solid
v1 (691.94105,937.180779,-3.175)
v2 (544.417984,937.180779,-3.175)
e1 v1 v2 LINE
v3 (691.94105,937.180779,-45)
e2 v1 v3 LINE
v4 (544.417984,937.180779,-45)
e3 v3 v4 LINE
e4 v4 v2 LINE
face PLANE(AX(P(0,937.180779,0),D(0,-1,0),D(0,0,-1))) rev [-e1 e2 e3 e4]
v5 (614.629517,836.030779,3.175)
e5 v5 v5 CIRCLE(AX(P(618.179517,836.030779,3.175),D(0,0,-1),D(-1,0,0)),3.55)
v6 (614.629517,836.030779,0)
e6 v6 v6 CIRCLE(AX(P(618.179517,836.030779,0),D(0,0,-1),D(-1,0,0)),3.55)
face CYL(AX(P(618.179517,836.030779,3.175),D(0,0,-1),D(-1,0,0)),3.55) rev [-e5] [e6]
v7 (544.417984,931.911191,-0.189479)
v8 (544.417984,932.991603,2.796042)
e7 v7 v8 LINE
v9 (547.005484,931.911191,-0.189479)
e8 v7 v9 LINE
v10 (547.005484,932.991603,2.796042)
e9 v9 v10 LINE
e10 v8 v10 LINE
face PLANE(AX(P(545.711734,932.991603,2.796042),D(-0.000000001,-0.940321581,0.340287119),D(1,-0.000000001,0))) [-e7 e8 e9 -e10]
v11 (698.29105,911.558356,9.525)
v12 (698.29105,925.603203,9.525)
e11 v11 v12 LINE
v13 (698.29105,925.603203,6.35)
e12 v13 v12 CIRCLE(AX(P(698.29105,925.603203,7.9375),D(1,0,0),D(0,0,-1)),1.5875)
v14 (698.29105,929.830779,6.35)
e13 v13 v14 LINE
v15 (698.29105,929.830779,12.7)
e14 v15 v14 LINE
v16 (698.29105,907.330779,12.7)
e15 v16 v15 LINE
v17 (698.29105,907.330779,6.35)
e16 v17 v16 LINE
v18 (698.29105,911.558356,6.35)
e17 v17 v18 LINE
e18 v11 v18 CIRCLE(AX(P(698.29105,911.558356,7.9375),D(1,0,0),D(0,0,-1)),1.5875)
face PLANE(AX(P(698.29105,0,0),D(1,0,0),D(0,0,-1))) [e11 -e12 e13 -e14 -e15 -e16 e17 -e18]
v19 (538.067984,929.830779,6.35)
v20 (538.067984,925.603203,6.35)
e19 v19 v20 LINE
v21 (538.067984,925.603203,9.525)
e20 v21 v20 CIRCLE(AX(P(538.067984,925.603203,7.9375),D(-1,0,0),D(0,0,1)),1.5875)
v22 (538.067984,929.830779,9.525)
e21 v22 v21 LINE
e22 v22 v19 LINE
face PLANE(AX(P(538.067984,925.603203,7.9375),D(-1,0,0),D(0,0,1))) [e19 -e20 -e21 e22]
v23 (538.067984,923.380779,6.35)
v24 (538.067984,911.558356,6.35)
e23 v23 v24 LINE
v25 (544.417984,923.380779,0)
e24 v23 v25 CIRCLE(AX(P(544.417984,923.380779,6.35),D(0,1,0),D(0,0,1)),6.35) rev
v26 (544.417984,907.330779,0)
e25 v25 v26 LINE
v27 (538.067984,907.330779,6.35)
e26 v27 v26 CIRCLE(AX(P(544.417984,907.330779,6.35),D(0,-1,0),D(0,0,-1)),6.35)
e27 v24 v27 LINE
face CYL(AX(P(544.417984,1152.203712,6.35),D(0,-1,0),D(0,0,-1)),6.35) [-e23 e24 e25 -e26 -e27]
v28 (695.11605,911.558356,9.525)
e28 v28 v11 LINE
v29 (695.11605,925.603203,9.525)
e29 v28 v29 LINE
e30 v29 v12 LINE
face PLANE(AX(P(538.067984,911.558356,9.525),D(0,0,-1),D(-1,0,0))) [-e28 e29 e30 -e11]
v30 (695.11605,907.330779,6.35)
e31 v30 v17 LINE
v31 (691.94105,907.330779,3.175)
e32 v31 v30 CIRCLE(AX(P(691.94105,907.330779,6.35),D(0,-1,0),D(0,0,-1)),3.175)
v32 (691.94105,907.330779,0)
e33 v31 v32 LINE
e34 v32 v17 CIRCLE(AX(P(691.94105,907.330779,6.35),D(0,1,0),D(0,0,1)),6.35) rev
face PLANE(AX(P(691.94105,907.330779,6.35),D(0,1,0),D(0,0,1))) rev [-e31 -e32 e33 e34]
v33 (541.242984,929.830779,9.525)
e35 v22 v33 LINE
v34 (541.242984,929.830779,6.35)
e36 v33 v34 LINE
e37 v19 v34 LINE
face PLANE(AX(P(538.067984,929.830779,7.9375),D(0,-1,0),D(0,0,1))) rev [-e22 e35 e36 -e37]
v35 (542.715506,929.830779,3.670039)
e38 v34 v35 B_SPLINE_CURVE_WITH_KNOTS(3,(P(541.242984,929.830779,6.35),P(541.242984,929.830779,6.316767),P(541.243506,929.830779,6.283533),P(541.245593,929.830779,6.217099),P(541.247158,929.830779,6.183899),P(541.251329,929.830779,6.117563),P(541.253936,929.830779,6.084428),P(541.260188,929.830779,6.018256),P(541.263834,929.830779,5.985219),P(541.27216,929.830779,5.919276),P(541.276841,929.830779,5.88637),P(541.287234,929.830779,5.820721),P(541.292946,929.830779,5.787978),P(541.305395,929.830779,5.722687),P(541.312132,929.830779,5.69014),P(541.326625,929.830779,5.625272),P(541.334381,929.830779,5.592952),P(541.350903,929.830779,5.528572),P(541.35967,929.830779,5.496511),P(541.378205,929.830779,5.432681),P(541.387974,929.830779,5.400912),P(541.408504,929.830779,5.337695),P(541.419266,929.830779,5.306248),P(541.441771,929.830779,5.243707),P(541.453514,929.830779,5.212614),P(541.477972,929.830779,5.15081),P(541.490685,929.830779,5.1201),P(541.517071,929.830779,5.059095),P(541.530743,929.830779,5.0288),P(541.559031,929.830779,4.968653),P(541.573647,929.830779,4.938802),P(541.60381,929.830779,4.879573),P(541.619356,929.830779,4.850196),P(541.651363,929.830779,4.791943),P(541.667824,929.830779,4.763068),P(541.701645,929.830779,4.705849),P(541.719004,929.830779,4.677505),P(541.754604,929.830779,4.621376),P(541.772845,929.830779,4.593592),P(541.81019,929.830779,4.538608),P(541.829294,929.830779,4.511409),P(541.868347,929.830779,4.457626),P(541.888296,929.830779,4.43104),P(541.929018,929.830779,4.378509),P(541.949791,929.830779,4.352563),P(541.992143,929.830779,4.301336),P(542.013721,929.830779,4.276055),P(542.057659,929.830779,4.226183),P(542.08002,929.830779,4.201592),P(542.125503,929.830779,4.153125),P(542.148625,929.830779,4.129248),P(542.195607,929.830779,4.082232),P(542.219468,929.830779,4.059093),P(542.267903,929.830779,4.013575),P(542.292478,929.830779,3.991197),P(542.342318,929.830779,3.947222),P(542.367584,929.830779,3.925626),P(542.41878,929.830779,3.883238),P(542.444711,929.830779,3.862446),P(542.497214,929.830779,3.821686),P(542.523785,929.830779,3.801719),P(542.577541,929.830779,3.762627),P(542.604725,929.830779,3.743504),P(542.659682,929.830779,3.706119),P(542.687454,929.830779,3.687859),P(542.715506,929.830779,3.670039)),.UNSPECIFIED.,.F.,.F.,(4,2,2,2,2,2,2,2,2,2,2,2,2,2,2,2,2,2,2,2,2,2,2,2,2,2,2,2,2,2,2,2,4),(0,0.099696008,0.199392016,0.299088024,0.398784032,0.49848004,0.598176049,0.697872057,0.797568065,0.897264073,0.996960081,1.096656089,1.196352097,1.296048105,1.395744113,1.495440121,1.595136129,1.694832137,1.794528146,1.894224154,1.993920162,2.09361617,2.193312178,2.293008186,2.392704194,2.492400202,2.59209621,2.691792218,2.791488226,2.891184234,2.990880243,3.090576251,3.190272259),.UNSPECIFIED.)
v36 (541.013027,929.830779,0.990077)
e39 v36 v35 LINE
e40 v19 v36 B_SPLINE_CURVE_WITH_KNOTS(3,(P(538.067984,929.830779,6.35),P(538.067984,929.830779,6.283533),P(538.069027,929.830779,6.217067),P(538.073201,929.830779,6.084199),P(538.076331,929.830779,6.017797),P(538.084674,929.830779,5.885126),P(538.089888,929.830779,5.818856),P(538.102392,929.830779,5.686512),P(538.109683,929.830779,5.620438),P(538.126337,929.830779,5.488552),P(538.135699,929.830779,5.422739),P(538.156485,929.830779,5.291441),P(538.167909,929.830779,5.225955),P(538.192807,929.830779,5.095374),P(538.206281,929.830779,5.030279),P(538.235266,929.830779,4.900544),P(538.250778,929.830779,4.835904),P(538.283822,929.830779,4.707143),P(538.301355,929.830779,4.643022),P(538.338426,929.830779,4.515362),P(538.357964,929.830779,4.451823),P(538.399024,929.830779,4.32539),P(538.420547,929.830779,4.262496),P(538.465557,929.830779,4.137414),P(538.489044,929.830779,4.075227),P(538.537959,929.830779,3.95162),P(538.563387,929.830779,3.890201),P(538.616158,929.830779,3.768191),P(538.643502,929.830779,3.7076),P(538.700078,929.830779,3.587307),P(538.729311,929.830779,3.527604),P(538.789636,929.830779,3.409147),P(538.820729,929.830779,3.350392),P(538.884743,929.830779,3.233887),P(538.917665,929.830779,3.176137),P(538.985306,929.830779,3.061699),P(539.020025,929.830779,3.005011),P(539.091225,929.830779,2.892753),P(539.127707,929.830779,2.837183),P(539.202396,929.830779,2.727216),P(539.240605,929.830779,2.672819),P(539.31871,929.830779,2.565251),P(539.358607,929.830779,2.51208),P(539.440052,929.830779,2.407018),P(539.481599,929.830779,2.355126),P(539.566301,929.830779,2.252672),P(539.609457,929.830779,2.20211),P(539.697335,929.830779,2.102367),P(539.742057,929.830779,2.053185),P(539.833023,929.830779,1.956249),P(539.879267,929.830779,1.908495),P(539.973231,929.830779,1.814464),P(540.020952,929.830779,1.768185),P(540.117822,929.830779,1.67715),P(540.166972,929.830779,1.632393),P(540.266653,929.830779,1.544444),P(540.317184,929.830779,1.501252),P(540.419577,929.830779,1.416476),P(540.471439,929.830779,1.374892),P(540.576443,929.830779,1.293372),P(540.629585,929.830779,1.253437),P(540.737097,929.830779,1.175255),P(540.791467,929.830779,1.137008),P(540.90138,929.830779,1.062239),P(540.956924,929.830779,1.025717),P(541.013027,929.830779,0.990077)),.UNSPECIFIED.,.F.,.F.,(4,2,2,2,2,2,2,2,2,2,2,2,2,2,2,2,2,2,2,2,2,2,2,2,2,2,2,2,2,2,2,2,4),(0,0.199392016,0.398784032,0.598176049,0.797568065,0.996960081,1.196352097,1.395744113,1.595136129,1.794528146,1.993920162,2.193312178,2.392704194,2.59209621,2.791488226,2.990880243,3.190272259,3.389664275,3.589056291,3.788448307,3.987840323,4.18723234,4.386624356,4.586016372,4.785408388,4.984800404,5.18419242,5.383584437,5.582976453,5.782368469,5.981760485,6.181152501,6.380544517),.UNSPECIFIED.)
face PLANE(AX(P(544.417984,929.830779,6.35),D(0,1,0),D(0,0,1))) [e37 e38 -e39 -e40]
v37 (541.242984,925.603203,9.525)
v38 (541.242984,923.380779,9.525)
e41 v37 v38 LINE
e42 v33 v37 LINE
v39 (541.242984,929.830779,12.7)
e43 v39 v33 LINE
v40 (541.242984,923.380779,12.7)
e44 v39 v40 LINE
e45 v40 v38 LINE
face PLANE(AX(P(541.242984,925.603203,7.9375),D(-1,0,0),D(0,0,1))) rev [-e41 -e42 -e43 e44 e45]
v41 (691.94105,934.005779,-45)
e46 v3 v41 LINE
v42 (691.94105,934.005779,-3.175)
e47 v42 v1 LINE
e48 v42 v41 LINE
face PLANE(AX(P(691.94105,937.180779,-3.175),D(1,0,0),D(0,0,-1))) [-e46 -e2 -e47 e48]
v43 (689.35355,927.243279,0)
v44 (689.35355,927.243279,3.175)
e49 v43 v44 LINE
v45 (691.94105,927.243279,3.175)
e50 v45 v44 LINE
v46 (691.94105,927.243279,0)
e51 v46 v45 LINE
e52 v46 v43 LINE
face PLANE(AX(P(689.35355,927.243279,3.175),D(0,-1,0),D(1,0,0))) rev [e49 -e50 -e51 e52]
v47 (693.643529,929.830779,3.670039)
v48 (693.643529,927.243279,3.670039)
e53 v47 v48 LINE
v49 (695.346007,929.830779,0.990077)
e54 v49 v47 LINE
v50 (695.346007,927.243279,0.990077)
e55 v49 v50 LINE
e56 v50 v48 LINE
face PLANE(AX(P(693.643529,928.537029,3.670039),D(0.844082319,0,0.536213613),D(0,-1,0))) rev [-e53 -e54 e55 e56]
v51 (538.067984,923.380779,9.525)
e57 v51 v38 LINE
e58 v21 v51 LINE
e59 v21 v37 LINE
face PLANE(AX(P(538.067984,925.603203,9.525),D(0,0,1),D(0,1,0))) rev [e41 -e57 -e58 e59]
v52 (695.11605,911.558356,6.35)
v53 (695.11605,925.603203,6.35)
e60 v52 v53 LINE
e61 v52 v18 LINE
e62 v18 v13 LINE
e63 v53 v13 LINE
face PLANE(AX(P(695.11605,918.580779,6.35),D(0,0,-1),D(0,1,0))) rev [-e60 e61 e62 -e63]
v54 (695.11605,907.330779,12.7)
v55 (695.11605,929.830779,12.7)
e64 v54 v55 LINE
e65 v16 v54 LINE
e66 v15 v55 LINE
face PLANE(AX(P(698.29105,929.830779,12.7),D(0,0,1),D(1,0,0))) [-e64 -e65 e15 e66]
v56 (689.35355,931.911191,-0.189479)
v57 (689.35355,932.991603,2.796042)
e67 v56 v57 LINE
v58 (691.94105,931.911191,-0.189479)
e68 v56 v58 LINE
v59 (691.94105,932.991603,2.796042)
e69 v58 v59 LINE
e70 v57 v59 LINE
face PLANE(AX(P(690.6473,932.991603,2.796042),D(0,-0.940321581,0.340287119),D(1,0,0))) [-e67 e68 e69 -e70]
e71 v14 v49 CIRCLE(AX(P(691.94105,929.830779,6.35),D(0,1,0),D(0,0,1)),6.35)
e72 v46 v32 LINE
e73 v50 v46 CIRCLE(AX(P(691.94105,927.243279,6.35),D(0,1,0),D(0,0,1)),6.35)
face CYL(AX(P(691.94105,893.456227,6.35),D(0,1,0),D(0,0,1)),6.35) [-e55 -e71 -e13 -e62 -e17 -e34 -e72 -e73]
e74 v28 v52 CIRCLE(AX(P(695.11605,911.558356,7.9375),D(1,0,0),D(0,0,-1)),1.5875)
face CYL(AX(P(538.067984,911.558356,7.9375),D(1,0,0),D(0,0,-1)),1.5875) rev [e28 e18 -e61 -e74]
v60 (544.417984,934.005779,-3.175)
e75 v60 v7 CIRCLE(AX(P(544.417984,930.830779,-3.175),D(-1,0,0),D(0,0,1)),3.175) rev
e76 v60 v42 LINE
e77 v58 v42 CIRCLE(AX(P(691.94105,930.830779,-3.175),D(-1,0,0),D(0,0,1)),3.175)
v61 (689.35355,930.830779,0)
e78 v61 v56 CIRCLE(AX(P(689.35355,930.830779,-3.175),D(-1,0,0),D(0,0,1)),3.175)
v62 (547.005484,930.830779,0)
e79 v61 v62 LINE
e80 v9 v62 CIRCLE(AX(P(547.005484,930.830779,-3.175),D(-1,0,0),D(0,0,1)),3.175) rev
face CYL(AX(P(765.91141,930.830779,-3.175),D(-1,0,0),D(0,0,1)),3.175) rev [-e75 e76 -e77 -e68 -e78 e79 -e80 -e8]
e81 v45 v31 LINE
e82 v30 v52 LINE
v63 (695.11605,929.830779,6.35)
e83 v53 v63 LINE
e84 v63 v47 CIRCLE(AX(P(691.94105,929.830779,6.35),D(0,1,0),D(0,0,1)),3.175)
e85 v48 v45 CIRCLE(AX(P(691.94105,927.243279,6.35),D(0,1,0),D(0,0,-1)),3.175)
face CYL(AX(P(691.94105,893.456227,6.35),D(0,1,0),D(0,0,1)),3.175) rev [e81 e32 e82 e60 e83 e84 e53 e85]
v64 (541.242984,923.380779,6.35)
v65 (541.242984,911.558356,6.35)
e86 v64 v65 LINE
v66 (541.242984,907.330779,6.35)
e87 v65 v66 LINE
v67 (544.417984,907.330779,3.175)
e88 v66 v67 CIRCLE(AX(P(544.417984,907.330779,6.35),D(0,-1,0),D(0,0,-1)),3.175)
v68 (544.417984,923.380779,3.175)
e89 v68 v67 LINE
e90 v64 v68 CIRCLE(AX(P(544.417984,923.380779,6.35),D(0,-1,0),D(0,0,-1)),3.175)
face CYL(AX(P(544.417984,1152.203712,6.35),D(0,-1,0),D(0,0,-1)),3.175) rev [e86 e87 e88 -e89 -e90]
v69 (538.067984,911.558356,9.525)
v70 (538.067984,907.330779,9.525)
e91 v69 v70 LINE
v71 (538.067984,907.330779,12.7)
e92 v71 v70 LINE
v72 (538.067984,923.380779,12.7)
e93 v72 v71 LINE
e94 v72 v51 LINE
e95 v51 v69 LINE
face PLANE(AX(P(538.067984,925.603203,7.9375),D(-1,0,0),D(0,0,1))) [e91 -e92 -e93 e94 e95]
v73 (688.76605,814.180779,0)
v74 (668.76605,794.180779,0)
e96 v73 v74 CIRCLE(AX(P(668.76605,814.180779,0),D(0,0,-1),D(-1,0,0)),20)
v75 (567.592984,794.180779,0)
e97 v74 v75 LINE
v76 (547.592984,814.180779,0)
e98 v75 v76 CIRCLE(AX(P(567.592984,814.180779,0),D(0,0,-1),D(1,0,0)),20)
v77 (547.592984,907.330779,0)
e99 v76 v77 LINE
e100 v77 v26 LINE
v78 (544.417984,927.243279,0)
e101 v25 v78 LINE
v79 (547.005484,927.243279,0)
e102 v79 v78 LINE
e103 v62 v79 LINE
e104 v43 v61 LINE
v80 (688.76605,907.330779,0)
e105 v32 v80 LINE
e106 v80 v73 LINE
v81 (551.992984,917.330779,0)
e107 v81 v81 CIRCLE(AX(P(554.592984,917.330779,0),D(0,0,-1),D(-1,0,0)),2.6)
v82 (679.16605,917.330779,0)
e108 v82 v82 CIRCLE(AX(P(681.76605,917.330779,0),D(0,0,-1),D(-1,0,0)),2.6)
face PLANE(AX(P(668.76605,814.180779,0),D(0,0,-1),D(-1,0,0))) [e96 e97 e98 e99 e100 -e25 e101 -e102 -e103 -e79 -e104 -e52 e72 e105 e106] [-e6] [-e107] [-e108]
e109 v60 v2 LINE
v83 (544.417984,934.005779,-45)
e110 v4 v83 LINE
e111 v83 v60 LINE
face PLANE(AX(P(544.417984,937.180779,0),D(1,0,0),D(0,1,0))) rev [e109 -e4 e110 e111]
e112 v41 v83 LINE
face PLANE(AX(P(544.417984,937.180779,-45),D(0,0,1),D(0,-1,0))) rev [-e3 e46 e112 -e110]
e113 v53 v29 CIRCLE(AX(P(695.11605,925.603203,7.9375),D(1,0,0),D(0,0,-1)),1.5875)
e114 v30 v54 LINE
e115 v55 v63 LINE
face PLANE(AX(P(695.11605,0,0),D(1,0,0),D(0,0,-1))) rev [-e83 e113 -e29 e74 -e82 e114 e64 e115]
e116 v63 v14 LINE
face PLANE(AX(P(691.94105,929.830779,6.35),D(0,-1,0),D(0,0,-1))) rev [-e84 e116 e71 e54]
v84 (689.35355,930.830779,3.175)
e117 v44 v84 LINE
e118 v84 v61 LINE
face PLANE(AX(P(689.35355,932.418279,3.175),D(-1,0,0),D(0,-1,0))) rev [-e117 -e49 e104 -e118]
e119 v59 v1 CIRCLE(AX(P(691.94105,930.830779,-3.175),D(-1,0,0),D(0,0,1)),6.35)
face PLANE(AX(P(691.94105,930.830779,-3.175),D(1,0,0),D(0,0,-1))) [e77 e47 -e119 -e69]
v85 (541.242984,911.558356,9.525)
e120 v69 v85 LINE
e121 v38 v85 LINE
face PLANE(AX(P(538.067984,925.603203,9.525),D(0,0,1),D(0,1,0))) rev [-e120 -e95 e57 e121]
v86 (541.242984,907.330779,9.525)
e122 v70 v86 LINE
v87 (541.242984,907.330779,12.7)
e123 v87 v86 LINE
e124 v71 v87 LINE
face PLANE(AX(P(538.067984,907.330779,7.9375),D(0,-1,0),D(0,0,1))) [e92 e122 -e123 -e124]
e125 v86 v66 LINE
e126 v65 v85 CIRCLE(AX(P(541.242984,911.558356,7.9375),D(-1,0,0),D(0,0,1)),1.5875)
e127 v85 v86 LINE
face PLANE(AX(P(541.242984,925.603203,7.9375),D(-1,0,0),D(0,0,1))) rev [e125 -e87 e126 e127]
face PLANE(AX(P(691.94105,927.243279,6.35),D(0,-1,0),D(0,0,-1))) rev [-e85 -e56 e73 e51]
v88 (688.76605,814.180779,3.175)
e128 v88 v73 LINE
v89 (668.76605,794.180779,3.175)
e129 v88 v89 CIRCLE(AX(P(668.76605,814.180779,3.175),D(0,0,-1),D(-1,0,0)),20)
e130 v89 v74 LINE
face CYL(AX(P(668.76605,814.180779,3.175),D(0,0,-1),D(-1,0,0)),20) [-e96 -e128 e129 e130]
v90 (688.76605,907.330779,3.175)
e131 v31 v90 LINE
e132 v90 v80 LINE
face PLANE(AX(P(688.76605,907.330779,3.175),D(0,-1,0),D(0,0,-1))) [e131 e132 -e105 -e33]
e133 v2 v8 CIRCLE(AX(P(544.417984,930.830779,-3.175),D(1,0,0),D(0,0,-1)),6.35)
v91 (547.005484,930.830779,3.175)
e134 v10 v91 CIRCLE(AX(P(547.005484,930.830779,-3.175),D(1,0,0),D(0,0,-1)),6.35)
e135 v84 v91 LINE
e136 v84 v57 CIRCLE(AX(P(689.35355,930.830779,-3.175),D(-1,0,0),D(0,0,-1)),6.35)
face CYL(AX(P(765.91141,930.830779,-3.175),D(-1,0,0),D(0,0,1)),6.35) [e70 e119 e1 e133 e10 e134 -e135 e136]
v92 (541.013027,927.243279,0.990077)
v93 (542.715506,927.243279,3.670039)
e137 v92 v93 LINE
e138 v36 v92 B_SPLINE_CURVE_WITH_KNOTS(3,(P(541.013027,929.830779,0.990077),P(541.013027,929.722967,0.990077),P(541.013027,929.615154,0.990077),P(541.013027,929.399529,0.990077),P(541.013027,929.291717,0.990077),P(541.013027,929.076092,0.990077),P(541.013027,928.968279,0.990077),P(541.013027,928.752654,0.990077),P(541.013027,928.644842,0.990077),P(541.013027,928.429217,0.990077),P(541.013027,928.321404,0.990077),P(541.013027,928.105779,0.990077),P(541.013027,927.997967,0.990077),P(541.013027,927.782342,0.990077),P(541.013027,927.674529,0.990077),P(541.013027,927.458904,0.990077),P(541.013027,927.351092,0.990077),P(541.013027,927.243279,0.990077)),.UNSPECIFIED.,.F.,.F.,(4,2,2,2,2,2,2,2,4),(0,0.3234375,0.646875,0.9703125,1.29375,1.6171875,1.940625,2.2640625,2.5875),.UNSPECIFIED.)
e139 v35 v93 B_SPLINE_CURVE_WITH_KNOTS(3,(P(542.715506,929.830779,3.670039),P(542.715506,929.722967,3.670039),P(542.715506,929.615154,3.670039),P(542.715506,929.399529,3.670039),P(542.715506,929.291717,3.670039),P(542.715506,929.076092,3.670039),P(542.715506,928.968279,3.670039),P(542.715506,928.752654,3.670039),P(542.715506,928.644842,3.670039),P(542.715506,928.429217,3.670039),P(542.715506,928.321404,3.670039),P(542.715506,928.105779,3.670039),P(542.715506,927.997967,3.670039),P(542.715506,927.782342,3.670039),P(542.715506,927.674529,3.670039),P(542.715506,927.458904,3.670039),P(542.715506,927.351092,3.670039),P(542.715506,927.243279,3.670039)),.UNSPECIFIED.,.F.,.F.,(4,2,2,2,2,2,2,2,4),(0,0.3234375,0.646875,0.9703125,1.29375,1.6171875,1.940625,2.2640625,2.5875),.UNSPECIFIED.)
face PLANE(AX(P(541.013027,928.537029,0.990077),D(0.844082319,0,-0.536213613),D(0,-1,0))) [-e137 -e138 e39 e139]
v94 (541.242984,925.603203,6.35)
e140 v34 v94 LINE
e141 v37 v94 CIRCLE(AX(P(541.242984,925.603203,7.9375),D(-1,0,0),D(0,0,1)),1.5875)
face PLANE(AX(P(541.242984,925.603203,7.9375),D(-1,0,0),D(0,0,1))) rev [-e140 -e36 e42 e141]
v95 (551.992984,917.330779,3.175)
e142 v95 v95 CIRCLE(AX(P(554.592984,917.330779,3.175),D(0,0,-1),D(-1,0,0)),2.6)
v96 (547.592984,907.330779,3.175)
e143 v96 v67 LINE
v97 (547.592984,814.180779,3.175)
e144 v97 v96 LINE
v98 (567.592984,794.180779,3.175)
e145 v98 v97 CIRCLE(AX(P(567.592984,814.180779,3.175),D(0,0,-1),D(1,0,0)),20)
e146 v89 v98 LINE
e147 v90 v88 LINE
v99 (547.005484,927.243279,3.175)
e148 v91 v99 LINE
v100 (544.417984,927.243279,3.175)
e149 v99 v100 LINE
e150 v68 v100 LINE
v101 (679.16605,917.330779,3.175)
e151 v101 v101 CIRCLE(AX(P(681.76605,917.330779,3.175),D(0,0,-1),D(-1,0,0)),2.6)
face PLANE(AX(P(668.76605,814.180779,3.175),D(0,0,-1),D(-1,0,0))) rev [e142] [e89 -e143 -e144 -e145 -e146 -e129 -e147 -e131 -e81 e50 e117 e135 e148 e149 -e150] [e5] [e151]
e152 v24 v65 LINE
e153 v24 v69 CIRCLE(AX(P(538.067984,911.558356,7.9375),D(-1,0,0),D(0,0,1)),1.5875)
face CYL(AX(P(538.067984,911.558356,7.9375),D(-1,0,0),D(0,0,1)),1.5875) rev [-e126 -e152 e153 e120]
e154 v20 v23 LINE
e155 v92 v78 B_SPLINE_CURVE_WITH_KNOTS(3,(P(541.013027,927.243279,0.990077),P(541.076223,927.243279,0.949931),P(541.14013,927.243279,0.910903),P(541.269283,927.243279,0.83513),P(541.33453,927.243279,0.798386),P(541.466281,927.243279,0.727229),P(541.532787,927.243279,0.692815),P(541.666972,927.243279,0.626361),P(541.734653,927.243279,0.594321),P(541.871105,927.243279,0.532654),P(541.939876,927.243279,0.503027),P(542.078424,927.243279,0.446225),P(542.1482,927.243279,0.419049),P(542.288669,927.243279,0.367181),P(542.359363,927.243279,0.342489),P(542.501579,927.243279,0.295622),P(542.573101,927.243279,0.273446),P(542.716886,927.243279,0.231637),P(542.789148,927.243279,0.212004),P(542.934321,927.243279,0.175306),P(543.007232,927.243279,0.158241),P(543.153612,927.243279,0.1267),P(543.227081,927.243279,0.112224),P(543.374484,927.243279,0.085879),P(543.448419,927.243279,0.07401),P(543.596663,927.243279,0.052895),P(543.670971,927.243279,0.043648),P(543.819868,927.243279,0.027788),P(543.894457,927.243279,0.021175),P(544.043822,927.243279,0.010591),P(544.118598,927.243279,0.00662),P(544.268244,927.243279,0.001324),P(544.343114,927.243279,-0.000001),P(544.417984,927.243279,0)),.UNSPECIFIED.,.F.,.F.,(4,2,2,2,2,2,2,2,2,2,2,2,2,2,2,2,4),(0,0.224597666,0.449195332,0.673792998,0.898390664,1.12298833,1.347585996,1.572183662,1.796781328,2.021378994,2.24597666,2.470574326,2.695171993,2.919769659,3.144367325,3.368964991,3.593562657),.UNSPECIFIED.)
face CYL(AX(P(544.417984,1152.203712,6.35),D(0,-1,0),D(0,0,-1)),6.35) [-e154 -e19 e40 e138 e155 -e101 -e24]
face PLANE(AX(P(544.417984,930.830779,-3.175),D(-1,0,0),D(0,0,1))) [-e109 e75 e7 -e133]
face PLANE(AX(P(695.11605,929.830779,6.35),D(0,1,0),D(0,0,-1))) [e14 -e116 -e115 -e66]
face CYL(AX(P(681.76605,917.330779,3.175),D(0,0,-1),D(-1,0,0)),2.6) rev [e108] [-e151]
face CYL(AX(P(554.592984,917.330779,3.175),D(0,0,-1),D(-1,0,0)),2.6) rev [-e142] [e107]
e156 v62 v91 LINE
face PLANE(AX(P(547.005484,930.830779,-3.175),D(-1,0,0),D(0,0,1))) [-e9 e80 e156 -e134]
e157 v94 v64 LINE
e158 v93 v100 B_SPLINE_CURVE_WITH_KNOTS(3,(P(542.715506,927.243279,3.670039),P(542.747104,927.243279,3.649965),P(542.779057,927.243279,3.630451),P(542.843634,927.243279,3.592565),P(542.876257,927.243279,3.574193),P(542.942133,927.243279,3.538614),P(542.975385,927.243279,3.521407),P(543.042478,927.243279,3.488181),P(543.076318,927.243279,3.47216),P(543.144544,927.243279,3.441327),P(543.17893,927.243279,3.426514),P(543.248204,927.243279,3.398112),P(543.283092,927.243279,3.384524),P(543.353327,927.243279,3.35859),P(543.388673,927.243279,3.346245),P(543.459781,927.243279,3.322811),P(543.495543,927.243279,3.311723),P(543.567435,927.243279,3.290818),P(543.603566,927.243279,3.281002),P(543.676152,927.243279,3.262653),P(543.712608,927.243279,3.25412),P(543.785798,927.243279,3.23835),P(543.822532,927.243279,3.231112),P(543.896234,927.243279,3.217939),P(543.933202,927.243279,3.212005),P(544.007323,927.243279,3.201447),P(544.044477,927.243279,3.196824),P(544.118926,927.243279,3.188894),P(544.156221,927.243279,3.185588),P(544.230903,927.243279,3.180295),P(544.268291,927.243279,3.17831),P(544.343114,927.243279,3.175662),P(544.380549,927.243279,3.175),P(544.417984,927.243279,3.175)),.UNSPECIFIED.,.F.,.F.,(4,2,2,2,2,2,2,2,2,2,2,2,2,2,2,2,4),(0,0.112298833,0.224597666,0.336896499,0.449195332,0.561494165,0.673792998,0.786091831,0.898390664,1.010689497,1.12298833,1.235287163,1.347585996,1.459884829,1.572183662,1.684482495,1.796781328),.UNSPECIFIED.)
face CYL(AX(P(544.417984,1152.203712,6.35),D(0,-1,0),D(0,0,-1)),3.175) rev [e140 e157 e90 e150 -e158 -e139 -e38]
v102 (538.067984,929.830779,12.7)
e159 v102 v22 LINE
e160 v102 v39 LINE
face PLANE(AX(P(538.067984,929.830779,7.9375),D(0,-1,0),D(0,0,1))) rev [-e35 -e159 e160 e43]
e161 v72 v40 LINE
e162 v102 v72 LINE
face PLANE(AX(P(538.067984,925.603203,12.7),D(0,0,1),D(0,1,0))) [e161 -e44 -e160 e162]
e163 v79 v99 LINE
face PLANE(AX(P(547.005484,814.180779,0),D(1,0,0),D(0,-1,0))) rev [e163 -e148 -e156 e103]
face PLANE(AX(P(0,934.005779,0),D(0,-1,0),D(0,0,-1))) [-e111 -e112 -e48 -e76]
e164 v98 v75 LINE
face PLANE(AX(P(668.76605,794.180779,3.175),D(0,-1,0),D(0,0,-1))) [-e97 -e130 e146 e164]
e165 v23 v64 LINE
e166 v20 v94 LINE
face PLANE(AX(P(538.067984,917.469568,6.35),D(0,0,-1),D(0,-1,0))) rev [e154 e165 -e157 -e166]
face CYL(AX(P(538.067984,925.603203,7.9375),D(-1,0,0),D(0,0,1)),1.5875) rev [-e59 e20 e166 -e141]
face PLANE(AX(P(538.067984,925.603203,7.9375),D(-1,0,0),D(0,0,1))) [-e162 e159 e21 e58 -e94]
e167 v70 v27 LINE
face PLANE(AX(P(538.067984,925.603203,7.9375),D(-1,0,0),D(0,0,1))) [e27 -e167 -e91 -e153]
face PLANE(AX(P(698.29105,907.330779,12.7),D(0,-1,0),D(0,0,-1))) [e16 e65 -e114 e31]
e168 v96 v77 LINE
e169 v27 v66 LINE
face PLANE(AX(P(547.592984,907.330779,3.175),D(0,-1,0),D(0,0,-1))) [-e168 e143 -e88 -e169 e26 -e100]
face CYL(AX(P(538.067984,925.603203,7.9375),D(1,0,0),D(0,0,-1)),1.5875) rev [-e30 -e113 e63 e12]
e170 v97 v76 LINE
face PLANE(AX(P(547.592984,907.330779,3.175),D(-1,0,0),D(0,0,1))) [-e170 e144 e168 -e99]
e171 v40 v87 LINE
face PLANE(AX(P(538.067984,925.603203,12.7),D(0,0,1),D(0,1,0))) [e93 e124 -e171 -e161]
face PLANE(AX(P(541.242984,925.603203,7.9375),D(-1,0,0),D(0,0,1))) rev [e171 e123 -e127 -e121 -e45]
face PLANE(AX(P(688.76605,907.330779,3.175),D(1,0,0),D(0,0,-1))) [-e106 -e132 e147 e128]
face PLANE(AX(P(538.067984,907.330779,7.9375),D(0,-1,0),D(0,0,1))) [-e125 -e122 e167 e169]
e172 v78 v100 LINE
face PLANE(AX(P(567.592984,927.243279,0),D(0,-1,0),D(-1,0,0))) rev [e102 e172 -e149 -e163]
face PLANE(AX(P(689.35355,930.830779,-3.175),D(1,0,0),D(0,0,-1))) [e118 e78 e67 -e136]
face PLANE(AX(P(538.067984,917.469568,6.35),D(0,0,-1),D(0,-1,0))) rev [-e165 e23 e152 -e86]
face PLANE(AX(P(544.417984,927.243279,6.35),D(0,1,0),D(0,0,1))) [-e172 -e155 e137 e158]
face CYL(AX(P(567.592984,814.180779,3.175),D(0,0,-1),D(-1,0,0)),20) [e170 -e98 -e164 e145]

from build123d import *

# Parameters (mm, degrees)
SKETCH13_R              = 2.6
SKETCH13_R_2            = 3.55
BASE_FLANGE1_DEPTH      = 3.175
EDGE_FLANGE2_DEPTH      = 22.5
EDGE_FLANGE3_DEPTH      = 22.5
CUT_EXTRUDE3_DEPTH      = 944.619626468
CUT_EXTRUDE3_DEPTH_BACK = 944.619626468
EDGE_FLANGE4_DEPTH      = 147.523066449
CORNER_START            = 927.243279461
CORNER_RELIEF2_DEPTH    = 2.5875
CORNER_START_2          = 544.417983929
CORNER_RELIEF2_2_DEPTH  = 2.5875
CORNER_RELIEF3_DEPTH    = 2.5875
CORNER_START_3          = 689.353550378
CORNER_RELIEF3_2_DEPTH  = 2.5875


with BuildPart() as part:
    # Base-Flange1: sheet metal written as solids
    # Sketch13 → Base-Flange1 (new body)
    with BuildSketch(Plane(origin=(0, 0, 0), x_dir=(-1, 0, 0), z_dir=(0, 0, -1))):
        with BuildLine():
            Line((-547.592983929, 907.330779461), (-547.592983929, 814.180779461))
            ThreePointArc((-547.592983929, 814.180779461), (-553.450848305, 800.038643837), (-567.592983929, 794.180779461))
            Line((-567.592983929, 794.180779461), (-668.766050378, 794.180779461))
            ThreePointArc((-668.766050378, 794.180779461), (-682.908186002, 800.038643837), (-688.766050378, 814.180779461))
            Line((-688.766050378, 814.180779461), (-688.766050378, 907.330779461))
            Line((-688.766050378, 907.330779461), (-691.941050378, 907.330779461))
            Line((-691.941050378, 907.330779461), (-691.941050378, 929.830779461))
            Line((-691.941050378, 929.830779461), (-544.417983929, 929.830779461))
            Line((-544.417983929, 929.830779461), (-544.417983929, 907.330779461))
            Line((-544.417983929, 907.330779461), (-547.592983929, 907.330779461))
        make_face()
        with Locations((-681.766050378, 917.330779461)):
            Circle(SKETCH13_R, mode=Mode.SUBTRACT)
        with Locations((-618.179517153, 836.030779461)):
            Circle(SKETCH13_R_2, mode=Mode.SUBTRACT)
        with Locations((-554.592983929, 917.330779461)):
            Circle(SKETCH13_R, mode=Mode.SUBTRACT)
    extrude(amount=-BASE_FLANGE1_DEPTH)

    # Edge-Flange2: sheet metal written as solids
    # Edge-Flange2 section (on a plane across the edge) → Edge-Flange2 (add)
    with BuildSketch(Plane(origin=(695.116050378, 907.330779461, 3.175), x_dir=(-1, 0, 0), z_dir=(0, 1, 0))):
        with BuildLine():
            Line((-3.175, 3.175), (-3.175, 9.525))
            Line((-3.175, 9.525), (0, 9.525))
            Line((0, 9.525), (0, 3.175))
            ThreePointArc((0, 3.175), (0.92993597, 0.92993597), (3.175, 0))
            Line((3.175, 0), (3.175, -3.175))
            ThreePointArc((3.175, -3.175), (-1.315128061, -1.315128061), (-3.175, 3.175))
        make_face()
    extrude(amount=EDGE_FLANGE2_DEPTH)

    # Edge-Flange3: sheet metal written as solids
    # Edge-Flange3 section (on a plane across the edge) → Edge-Flange3 (add)
    with BuildSketch(Plane(origin=(541.242983929, 929.830779461, 3.175), x_dir=(1, 0, 0), z_dir=(0, -1, 0))):
        with BuildLine():
            Line((-3.175, 3.175), (-3.175, 9.525))
            Line((-3.175, 9.525), (0, 9.525))
            Line((0, 9.525), (0, 3.175))
            ThreePointArc((0, 3.175), (0.92993597, 0.92993597), (3.175, 0))
            Line((3.175, 0), (3.175, -3.175))
            ThreePointArc((3.175, -3.175), (-1.315128061, -1.315128061), (-3.175, 3.175))
        make_face()
    extrude(amount=EDGE_FLANGE3_DEPTH)

    # Sketch27 → Cut-Extrude3 (cut, two sides: drawn at the far end of the back side and taken through both)
    with BuildSketch(Plane(origin=(698.291050378, 0, 0), x_dir=(0, 0, -1), z_dir=(1, 0, 0)).offset(-CUT_EXTRUDE3_DEPTH_BACK)):
        with BuildLine():
            Line((-9.525, 911.558356296), (-9.525, 925.603202625))
            ThreePointArc((-9.525, 925.603202625), (-7.9375, 927.190702625), (-6.35, 925.603202625))
            Line((-6.35, 925.603202625), (-6.35, 911.558356296))
            ThreePointArc((-6.35, 911.558356296), (-7.9375, 909.970856296), (-9.525, 911.558356296))
        make_face()
    extrude(amount=CUT_EXTRUDE3_DEPTH + CUT_EXTRUDE3_DEPTH_BACK, mode=Mode.SUBTRACT)

    # Edge-Flange4: sheet metal written as solids
    # Edge-Flange4 section (on a plane across the edge) → Edge-Flange4 (add)
    with BuildSketch(Plane(origin=(544.417983929, 934.005779461, 0), x_dir=(0, -1, 0), z_dir=(1, 0, 0))):
        with BuildLine():
            Line((-3.175, 3.175), (-3.175, 45))
            Line((-3.175, 45), (0, 45))
            Line((0, 45), (0, 3.175))
            ThreePointArc((0, 3.175), (0.92993597, 0.92993597), (3.175, 0))
            Line((3.175, 0), (4.175, 0))
            Line((4.175, 0), (4.175, -3.175))
            Line((4.175, -3.175), (3.175, -3.175))
            ThreePointArc((3.175, -3.175), (-1.315128061, -1.315128061), (-3.175, 3.175))
        make_face()
    extrude(amount=EDGE_FLANGE4_DEPTH)

    # Corner Relief2: read off the stored shape, not the designer's step
    # Corner Relief2 outline → Corner Relief2 (cut)
    with BuildSketch(Plane(origin=(0, 0, 0), x_dir=(1, 0, 0), z_dir=(0, 1, 0)).offset(CORNER_START)):
        with BuildLine():
            Line((541.013027484, -0.990077276), (542.715505707, -3.670038638))
            ThreePointArc((542.715505707, -3.670038638), (543.531488674, -3.301270566), (544.417983929, -3.175))
            Line((544.417983929, -3.175), (544.417983929, 0))
            ThreePointArc((544.417983929, 0), (542.644993418, -0.252541132), (541.013027484, -0.990077276))
        make_face()
    extrude(amount=CORNER_RELIEF2_DEPTH, mode=Mode.SUBTRACT)

    # Corner Relief2 2 outline → Corner Relief2 2 (cut)
    with BuildSketch(Plane.YZ.offset(CORNER_START_2)):
        with BuildLine():
            Line((930.830779461, 3.175), (927.243279461, 3.175))
            Line((927.243279461, 3.175), (927.243279461, 0))
            Line((927.243279461, 0), (930.830779461, 0))
            ThreePointArc((930.830779461, 0), (931.379229895, -0.047728486), (931.911191064, -0.189478979))
            Line((931.911191064, -0.189478979), (932.991602668, 2.796042042))
            ThreePointArc((932.991602668, 2.796042042), (931.92768033, 3.079543028), (930.830779461, 3.175))
        make_face()
    extrude(amount=CORNER_RELIEF2_2_DEPTH, mode=Mode.SUBTRACT)

    # Corner Relief3: read off the stored shape, not the designer's step
    # Corner Relief3 outline → Corner Relief3 (cut)
    with BuildSketch(Plane(origin=(0, 0, 0), x_dir=(1, 0, 0), z_dir=(0, 1, 0)).offset(CORNER_START)):
        with BuildLine():
            ThreePointArc((691.941050378, -3.175), (692.827545633, -3.301270566), (693.6435286, -3.670038638))
            Line((693.6435286, -3.670038638), (695.346006823, -0.990077276))
            ThreePointArc((695.346006823, -0.990077276), (693.714040889, -0.252541132), (691.941050378, 0))
            Line((691.941050378, 0), (691.941050378, -3.175))
        make_face()
    extrude(amount=CORNER_RELIEF3_DEPTH, mode=Mode.SUBTRACT)

    # Corner Relief3 2 outline → Corner Relief3 2 (cut)
    with BuildSketch(Plane.YZ.offset(CORNER_START_3)):
        with BuildLine():
            Line((930.830779461, 3.175), (927.243279461, 3.175))
            Line((927.243279461, 3.175), (927.243279461, 0))
            Line((927.243279461, 0), (930.830779461, 0))
            ThreePointArc((930.830779461, 0), (931.379229895, -0.047728486), (931.911191064, -0.189478979))
            Line((931.911191064, -0.189478979), (932.991602668, 2.796042042))
            ThreePointArc((932.991602668, 2.796042042), (931.92768033, 3.079543028), (930.830779461, 3.175))
        make_face()
    extrude(amount=CORNER_RELIEF3_2_DEPTH, mode=Mode.SUBTRACT)


solid = part.part
